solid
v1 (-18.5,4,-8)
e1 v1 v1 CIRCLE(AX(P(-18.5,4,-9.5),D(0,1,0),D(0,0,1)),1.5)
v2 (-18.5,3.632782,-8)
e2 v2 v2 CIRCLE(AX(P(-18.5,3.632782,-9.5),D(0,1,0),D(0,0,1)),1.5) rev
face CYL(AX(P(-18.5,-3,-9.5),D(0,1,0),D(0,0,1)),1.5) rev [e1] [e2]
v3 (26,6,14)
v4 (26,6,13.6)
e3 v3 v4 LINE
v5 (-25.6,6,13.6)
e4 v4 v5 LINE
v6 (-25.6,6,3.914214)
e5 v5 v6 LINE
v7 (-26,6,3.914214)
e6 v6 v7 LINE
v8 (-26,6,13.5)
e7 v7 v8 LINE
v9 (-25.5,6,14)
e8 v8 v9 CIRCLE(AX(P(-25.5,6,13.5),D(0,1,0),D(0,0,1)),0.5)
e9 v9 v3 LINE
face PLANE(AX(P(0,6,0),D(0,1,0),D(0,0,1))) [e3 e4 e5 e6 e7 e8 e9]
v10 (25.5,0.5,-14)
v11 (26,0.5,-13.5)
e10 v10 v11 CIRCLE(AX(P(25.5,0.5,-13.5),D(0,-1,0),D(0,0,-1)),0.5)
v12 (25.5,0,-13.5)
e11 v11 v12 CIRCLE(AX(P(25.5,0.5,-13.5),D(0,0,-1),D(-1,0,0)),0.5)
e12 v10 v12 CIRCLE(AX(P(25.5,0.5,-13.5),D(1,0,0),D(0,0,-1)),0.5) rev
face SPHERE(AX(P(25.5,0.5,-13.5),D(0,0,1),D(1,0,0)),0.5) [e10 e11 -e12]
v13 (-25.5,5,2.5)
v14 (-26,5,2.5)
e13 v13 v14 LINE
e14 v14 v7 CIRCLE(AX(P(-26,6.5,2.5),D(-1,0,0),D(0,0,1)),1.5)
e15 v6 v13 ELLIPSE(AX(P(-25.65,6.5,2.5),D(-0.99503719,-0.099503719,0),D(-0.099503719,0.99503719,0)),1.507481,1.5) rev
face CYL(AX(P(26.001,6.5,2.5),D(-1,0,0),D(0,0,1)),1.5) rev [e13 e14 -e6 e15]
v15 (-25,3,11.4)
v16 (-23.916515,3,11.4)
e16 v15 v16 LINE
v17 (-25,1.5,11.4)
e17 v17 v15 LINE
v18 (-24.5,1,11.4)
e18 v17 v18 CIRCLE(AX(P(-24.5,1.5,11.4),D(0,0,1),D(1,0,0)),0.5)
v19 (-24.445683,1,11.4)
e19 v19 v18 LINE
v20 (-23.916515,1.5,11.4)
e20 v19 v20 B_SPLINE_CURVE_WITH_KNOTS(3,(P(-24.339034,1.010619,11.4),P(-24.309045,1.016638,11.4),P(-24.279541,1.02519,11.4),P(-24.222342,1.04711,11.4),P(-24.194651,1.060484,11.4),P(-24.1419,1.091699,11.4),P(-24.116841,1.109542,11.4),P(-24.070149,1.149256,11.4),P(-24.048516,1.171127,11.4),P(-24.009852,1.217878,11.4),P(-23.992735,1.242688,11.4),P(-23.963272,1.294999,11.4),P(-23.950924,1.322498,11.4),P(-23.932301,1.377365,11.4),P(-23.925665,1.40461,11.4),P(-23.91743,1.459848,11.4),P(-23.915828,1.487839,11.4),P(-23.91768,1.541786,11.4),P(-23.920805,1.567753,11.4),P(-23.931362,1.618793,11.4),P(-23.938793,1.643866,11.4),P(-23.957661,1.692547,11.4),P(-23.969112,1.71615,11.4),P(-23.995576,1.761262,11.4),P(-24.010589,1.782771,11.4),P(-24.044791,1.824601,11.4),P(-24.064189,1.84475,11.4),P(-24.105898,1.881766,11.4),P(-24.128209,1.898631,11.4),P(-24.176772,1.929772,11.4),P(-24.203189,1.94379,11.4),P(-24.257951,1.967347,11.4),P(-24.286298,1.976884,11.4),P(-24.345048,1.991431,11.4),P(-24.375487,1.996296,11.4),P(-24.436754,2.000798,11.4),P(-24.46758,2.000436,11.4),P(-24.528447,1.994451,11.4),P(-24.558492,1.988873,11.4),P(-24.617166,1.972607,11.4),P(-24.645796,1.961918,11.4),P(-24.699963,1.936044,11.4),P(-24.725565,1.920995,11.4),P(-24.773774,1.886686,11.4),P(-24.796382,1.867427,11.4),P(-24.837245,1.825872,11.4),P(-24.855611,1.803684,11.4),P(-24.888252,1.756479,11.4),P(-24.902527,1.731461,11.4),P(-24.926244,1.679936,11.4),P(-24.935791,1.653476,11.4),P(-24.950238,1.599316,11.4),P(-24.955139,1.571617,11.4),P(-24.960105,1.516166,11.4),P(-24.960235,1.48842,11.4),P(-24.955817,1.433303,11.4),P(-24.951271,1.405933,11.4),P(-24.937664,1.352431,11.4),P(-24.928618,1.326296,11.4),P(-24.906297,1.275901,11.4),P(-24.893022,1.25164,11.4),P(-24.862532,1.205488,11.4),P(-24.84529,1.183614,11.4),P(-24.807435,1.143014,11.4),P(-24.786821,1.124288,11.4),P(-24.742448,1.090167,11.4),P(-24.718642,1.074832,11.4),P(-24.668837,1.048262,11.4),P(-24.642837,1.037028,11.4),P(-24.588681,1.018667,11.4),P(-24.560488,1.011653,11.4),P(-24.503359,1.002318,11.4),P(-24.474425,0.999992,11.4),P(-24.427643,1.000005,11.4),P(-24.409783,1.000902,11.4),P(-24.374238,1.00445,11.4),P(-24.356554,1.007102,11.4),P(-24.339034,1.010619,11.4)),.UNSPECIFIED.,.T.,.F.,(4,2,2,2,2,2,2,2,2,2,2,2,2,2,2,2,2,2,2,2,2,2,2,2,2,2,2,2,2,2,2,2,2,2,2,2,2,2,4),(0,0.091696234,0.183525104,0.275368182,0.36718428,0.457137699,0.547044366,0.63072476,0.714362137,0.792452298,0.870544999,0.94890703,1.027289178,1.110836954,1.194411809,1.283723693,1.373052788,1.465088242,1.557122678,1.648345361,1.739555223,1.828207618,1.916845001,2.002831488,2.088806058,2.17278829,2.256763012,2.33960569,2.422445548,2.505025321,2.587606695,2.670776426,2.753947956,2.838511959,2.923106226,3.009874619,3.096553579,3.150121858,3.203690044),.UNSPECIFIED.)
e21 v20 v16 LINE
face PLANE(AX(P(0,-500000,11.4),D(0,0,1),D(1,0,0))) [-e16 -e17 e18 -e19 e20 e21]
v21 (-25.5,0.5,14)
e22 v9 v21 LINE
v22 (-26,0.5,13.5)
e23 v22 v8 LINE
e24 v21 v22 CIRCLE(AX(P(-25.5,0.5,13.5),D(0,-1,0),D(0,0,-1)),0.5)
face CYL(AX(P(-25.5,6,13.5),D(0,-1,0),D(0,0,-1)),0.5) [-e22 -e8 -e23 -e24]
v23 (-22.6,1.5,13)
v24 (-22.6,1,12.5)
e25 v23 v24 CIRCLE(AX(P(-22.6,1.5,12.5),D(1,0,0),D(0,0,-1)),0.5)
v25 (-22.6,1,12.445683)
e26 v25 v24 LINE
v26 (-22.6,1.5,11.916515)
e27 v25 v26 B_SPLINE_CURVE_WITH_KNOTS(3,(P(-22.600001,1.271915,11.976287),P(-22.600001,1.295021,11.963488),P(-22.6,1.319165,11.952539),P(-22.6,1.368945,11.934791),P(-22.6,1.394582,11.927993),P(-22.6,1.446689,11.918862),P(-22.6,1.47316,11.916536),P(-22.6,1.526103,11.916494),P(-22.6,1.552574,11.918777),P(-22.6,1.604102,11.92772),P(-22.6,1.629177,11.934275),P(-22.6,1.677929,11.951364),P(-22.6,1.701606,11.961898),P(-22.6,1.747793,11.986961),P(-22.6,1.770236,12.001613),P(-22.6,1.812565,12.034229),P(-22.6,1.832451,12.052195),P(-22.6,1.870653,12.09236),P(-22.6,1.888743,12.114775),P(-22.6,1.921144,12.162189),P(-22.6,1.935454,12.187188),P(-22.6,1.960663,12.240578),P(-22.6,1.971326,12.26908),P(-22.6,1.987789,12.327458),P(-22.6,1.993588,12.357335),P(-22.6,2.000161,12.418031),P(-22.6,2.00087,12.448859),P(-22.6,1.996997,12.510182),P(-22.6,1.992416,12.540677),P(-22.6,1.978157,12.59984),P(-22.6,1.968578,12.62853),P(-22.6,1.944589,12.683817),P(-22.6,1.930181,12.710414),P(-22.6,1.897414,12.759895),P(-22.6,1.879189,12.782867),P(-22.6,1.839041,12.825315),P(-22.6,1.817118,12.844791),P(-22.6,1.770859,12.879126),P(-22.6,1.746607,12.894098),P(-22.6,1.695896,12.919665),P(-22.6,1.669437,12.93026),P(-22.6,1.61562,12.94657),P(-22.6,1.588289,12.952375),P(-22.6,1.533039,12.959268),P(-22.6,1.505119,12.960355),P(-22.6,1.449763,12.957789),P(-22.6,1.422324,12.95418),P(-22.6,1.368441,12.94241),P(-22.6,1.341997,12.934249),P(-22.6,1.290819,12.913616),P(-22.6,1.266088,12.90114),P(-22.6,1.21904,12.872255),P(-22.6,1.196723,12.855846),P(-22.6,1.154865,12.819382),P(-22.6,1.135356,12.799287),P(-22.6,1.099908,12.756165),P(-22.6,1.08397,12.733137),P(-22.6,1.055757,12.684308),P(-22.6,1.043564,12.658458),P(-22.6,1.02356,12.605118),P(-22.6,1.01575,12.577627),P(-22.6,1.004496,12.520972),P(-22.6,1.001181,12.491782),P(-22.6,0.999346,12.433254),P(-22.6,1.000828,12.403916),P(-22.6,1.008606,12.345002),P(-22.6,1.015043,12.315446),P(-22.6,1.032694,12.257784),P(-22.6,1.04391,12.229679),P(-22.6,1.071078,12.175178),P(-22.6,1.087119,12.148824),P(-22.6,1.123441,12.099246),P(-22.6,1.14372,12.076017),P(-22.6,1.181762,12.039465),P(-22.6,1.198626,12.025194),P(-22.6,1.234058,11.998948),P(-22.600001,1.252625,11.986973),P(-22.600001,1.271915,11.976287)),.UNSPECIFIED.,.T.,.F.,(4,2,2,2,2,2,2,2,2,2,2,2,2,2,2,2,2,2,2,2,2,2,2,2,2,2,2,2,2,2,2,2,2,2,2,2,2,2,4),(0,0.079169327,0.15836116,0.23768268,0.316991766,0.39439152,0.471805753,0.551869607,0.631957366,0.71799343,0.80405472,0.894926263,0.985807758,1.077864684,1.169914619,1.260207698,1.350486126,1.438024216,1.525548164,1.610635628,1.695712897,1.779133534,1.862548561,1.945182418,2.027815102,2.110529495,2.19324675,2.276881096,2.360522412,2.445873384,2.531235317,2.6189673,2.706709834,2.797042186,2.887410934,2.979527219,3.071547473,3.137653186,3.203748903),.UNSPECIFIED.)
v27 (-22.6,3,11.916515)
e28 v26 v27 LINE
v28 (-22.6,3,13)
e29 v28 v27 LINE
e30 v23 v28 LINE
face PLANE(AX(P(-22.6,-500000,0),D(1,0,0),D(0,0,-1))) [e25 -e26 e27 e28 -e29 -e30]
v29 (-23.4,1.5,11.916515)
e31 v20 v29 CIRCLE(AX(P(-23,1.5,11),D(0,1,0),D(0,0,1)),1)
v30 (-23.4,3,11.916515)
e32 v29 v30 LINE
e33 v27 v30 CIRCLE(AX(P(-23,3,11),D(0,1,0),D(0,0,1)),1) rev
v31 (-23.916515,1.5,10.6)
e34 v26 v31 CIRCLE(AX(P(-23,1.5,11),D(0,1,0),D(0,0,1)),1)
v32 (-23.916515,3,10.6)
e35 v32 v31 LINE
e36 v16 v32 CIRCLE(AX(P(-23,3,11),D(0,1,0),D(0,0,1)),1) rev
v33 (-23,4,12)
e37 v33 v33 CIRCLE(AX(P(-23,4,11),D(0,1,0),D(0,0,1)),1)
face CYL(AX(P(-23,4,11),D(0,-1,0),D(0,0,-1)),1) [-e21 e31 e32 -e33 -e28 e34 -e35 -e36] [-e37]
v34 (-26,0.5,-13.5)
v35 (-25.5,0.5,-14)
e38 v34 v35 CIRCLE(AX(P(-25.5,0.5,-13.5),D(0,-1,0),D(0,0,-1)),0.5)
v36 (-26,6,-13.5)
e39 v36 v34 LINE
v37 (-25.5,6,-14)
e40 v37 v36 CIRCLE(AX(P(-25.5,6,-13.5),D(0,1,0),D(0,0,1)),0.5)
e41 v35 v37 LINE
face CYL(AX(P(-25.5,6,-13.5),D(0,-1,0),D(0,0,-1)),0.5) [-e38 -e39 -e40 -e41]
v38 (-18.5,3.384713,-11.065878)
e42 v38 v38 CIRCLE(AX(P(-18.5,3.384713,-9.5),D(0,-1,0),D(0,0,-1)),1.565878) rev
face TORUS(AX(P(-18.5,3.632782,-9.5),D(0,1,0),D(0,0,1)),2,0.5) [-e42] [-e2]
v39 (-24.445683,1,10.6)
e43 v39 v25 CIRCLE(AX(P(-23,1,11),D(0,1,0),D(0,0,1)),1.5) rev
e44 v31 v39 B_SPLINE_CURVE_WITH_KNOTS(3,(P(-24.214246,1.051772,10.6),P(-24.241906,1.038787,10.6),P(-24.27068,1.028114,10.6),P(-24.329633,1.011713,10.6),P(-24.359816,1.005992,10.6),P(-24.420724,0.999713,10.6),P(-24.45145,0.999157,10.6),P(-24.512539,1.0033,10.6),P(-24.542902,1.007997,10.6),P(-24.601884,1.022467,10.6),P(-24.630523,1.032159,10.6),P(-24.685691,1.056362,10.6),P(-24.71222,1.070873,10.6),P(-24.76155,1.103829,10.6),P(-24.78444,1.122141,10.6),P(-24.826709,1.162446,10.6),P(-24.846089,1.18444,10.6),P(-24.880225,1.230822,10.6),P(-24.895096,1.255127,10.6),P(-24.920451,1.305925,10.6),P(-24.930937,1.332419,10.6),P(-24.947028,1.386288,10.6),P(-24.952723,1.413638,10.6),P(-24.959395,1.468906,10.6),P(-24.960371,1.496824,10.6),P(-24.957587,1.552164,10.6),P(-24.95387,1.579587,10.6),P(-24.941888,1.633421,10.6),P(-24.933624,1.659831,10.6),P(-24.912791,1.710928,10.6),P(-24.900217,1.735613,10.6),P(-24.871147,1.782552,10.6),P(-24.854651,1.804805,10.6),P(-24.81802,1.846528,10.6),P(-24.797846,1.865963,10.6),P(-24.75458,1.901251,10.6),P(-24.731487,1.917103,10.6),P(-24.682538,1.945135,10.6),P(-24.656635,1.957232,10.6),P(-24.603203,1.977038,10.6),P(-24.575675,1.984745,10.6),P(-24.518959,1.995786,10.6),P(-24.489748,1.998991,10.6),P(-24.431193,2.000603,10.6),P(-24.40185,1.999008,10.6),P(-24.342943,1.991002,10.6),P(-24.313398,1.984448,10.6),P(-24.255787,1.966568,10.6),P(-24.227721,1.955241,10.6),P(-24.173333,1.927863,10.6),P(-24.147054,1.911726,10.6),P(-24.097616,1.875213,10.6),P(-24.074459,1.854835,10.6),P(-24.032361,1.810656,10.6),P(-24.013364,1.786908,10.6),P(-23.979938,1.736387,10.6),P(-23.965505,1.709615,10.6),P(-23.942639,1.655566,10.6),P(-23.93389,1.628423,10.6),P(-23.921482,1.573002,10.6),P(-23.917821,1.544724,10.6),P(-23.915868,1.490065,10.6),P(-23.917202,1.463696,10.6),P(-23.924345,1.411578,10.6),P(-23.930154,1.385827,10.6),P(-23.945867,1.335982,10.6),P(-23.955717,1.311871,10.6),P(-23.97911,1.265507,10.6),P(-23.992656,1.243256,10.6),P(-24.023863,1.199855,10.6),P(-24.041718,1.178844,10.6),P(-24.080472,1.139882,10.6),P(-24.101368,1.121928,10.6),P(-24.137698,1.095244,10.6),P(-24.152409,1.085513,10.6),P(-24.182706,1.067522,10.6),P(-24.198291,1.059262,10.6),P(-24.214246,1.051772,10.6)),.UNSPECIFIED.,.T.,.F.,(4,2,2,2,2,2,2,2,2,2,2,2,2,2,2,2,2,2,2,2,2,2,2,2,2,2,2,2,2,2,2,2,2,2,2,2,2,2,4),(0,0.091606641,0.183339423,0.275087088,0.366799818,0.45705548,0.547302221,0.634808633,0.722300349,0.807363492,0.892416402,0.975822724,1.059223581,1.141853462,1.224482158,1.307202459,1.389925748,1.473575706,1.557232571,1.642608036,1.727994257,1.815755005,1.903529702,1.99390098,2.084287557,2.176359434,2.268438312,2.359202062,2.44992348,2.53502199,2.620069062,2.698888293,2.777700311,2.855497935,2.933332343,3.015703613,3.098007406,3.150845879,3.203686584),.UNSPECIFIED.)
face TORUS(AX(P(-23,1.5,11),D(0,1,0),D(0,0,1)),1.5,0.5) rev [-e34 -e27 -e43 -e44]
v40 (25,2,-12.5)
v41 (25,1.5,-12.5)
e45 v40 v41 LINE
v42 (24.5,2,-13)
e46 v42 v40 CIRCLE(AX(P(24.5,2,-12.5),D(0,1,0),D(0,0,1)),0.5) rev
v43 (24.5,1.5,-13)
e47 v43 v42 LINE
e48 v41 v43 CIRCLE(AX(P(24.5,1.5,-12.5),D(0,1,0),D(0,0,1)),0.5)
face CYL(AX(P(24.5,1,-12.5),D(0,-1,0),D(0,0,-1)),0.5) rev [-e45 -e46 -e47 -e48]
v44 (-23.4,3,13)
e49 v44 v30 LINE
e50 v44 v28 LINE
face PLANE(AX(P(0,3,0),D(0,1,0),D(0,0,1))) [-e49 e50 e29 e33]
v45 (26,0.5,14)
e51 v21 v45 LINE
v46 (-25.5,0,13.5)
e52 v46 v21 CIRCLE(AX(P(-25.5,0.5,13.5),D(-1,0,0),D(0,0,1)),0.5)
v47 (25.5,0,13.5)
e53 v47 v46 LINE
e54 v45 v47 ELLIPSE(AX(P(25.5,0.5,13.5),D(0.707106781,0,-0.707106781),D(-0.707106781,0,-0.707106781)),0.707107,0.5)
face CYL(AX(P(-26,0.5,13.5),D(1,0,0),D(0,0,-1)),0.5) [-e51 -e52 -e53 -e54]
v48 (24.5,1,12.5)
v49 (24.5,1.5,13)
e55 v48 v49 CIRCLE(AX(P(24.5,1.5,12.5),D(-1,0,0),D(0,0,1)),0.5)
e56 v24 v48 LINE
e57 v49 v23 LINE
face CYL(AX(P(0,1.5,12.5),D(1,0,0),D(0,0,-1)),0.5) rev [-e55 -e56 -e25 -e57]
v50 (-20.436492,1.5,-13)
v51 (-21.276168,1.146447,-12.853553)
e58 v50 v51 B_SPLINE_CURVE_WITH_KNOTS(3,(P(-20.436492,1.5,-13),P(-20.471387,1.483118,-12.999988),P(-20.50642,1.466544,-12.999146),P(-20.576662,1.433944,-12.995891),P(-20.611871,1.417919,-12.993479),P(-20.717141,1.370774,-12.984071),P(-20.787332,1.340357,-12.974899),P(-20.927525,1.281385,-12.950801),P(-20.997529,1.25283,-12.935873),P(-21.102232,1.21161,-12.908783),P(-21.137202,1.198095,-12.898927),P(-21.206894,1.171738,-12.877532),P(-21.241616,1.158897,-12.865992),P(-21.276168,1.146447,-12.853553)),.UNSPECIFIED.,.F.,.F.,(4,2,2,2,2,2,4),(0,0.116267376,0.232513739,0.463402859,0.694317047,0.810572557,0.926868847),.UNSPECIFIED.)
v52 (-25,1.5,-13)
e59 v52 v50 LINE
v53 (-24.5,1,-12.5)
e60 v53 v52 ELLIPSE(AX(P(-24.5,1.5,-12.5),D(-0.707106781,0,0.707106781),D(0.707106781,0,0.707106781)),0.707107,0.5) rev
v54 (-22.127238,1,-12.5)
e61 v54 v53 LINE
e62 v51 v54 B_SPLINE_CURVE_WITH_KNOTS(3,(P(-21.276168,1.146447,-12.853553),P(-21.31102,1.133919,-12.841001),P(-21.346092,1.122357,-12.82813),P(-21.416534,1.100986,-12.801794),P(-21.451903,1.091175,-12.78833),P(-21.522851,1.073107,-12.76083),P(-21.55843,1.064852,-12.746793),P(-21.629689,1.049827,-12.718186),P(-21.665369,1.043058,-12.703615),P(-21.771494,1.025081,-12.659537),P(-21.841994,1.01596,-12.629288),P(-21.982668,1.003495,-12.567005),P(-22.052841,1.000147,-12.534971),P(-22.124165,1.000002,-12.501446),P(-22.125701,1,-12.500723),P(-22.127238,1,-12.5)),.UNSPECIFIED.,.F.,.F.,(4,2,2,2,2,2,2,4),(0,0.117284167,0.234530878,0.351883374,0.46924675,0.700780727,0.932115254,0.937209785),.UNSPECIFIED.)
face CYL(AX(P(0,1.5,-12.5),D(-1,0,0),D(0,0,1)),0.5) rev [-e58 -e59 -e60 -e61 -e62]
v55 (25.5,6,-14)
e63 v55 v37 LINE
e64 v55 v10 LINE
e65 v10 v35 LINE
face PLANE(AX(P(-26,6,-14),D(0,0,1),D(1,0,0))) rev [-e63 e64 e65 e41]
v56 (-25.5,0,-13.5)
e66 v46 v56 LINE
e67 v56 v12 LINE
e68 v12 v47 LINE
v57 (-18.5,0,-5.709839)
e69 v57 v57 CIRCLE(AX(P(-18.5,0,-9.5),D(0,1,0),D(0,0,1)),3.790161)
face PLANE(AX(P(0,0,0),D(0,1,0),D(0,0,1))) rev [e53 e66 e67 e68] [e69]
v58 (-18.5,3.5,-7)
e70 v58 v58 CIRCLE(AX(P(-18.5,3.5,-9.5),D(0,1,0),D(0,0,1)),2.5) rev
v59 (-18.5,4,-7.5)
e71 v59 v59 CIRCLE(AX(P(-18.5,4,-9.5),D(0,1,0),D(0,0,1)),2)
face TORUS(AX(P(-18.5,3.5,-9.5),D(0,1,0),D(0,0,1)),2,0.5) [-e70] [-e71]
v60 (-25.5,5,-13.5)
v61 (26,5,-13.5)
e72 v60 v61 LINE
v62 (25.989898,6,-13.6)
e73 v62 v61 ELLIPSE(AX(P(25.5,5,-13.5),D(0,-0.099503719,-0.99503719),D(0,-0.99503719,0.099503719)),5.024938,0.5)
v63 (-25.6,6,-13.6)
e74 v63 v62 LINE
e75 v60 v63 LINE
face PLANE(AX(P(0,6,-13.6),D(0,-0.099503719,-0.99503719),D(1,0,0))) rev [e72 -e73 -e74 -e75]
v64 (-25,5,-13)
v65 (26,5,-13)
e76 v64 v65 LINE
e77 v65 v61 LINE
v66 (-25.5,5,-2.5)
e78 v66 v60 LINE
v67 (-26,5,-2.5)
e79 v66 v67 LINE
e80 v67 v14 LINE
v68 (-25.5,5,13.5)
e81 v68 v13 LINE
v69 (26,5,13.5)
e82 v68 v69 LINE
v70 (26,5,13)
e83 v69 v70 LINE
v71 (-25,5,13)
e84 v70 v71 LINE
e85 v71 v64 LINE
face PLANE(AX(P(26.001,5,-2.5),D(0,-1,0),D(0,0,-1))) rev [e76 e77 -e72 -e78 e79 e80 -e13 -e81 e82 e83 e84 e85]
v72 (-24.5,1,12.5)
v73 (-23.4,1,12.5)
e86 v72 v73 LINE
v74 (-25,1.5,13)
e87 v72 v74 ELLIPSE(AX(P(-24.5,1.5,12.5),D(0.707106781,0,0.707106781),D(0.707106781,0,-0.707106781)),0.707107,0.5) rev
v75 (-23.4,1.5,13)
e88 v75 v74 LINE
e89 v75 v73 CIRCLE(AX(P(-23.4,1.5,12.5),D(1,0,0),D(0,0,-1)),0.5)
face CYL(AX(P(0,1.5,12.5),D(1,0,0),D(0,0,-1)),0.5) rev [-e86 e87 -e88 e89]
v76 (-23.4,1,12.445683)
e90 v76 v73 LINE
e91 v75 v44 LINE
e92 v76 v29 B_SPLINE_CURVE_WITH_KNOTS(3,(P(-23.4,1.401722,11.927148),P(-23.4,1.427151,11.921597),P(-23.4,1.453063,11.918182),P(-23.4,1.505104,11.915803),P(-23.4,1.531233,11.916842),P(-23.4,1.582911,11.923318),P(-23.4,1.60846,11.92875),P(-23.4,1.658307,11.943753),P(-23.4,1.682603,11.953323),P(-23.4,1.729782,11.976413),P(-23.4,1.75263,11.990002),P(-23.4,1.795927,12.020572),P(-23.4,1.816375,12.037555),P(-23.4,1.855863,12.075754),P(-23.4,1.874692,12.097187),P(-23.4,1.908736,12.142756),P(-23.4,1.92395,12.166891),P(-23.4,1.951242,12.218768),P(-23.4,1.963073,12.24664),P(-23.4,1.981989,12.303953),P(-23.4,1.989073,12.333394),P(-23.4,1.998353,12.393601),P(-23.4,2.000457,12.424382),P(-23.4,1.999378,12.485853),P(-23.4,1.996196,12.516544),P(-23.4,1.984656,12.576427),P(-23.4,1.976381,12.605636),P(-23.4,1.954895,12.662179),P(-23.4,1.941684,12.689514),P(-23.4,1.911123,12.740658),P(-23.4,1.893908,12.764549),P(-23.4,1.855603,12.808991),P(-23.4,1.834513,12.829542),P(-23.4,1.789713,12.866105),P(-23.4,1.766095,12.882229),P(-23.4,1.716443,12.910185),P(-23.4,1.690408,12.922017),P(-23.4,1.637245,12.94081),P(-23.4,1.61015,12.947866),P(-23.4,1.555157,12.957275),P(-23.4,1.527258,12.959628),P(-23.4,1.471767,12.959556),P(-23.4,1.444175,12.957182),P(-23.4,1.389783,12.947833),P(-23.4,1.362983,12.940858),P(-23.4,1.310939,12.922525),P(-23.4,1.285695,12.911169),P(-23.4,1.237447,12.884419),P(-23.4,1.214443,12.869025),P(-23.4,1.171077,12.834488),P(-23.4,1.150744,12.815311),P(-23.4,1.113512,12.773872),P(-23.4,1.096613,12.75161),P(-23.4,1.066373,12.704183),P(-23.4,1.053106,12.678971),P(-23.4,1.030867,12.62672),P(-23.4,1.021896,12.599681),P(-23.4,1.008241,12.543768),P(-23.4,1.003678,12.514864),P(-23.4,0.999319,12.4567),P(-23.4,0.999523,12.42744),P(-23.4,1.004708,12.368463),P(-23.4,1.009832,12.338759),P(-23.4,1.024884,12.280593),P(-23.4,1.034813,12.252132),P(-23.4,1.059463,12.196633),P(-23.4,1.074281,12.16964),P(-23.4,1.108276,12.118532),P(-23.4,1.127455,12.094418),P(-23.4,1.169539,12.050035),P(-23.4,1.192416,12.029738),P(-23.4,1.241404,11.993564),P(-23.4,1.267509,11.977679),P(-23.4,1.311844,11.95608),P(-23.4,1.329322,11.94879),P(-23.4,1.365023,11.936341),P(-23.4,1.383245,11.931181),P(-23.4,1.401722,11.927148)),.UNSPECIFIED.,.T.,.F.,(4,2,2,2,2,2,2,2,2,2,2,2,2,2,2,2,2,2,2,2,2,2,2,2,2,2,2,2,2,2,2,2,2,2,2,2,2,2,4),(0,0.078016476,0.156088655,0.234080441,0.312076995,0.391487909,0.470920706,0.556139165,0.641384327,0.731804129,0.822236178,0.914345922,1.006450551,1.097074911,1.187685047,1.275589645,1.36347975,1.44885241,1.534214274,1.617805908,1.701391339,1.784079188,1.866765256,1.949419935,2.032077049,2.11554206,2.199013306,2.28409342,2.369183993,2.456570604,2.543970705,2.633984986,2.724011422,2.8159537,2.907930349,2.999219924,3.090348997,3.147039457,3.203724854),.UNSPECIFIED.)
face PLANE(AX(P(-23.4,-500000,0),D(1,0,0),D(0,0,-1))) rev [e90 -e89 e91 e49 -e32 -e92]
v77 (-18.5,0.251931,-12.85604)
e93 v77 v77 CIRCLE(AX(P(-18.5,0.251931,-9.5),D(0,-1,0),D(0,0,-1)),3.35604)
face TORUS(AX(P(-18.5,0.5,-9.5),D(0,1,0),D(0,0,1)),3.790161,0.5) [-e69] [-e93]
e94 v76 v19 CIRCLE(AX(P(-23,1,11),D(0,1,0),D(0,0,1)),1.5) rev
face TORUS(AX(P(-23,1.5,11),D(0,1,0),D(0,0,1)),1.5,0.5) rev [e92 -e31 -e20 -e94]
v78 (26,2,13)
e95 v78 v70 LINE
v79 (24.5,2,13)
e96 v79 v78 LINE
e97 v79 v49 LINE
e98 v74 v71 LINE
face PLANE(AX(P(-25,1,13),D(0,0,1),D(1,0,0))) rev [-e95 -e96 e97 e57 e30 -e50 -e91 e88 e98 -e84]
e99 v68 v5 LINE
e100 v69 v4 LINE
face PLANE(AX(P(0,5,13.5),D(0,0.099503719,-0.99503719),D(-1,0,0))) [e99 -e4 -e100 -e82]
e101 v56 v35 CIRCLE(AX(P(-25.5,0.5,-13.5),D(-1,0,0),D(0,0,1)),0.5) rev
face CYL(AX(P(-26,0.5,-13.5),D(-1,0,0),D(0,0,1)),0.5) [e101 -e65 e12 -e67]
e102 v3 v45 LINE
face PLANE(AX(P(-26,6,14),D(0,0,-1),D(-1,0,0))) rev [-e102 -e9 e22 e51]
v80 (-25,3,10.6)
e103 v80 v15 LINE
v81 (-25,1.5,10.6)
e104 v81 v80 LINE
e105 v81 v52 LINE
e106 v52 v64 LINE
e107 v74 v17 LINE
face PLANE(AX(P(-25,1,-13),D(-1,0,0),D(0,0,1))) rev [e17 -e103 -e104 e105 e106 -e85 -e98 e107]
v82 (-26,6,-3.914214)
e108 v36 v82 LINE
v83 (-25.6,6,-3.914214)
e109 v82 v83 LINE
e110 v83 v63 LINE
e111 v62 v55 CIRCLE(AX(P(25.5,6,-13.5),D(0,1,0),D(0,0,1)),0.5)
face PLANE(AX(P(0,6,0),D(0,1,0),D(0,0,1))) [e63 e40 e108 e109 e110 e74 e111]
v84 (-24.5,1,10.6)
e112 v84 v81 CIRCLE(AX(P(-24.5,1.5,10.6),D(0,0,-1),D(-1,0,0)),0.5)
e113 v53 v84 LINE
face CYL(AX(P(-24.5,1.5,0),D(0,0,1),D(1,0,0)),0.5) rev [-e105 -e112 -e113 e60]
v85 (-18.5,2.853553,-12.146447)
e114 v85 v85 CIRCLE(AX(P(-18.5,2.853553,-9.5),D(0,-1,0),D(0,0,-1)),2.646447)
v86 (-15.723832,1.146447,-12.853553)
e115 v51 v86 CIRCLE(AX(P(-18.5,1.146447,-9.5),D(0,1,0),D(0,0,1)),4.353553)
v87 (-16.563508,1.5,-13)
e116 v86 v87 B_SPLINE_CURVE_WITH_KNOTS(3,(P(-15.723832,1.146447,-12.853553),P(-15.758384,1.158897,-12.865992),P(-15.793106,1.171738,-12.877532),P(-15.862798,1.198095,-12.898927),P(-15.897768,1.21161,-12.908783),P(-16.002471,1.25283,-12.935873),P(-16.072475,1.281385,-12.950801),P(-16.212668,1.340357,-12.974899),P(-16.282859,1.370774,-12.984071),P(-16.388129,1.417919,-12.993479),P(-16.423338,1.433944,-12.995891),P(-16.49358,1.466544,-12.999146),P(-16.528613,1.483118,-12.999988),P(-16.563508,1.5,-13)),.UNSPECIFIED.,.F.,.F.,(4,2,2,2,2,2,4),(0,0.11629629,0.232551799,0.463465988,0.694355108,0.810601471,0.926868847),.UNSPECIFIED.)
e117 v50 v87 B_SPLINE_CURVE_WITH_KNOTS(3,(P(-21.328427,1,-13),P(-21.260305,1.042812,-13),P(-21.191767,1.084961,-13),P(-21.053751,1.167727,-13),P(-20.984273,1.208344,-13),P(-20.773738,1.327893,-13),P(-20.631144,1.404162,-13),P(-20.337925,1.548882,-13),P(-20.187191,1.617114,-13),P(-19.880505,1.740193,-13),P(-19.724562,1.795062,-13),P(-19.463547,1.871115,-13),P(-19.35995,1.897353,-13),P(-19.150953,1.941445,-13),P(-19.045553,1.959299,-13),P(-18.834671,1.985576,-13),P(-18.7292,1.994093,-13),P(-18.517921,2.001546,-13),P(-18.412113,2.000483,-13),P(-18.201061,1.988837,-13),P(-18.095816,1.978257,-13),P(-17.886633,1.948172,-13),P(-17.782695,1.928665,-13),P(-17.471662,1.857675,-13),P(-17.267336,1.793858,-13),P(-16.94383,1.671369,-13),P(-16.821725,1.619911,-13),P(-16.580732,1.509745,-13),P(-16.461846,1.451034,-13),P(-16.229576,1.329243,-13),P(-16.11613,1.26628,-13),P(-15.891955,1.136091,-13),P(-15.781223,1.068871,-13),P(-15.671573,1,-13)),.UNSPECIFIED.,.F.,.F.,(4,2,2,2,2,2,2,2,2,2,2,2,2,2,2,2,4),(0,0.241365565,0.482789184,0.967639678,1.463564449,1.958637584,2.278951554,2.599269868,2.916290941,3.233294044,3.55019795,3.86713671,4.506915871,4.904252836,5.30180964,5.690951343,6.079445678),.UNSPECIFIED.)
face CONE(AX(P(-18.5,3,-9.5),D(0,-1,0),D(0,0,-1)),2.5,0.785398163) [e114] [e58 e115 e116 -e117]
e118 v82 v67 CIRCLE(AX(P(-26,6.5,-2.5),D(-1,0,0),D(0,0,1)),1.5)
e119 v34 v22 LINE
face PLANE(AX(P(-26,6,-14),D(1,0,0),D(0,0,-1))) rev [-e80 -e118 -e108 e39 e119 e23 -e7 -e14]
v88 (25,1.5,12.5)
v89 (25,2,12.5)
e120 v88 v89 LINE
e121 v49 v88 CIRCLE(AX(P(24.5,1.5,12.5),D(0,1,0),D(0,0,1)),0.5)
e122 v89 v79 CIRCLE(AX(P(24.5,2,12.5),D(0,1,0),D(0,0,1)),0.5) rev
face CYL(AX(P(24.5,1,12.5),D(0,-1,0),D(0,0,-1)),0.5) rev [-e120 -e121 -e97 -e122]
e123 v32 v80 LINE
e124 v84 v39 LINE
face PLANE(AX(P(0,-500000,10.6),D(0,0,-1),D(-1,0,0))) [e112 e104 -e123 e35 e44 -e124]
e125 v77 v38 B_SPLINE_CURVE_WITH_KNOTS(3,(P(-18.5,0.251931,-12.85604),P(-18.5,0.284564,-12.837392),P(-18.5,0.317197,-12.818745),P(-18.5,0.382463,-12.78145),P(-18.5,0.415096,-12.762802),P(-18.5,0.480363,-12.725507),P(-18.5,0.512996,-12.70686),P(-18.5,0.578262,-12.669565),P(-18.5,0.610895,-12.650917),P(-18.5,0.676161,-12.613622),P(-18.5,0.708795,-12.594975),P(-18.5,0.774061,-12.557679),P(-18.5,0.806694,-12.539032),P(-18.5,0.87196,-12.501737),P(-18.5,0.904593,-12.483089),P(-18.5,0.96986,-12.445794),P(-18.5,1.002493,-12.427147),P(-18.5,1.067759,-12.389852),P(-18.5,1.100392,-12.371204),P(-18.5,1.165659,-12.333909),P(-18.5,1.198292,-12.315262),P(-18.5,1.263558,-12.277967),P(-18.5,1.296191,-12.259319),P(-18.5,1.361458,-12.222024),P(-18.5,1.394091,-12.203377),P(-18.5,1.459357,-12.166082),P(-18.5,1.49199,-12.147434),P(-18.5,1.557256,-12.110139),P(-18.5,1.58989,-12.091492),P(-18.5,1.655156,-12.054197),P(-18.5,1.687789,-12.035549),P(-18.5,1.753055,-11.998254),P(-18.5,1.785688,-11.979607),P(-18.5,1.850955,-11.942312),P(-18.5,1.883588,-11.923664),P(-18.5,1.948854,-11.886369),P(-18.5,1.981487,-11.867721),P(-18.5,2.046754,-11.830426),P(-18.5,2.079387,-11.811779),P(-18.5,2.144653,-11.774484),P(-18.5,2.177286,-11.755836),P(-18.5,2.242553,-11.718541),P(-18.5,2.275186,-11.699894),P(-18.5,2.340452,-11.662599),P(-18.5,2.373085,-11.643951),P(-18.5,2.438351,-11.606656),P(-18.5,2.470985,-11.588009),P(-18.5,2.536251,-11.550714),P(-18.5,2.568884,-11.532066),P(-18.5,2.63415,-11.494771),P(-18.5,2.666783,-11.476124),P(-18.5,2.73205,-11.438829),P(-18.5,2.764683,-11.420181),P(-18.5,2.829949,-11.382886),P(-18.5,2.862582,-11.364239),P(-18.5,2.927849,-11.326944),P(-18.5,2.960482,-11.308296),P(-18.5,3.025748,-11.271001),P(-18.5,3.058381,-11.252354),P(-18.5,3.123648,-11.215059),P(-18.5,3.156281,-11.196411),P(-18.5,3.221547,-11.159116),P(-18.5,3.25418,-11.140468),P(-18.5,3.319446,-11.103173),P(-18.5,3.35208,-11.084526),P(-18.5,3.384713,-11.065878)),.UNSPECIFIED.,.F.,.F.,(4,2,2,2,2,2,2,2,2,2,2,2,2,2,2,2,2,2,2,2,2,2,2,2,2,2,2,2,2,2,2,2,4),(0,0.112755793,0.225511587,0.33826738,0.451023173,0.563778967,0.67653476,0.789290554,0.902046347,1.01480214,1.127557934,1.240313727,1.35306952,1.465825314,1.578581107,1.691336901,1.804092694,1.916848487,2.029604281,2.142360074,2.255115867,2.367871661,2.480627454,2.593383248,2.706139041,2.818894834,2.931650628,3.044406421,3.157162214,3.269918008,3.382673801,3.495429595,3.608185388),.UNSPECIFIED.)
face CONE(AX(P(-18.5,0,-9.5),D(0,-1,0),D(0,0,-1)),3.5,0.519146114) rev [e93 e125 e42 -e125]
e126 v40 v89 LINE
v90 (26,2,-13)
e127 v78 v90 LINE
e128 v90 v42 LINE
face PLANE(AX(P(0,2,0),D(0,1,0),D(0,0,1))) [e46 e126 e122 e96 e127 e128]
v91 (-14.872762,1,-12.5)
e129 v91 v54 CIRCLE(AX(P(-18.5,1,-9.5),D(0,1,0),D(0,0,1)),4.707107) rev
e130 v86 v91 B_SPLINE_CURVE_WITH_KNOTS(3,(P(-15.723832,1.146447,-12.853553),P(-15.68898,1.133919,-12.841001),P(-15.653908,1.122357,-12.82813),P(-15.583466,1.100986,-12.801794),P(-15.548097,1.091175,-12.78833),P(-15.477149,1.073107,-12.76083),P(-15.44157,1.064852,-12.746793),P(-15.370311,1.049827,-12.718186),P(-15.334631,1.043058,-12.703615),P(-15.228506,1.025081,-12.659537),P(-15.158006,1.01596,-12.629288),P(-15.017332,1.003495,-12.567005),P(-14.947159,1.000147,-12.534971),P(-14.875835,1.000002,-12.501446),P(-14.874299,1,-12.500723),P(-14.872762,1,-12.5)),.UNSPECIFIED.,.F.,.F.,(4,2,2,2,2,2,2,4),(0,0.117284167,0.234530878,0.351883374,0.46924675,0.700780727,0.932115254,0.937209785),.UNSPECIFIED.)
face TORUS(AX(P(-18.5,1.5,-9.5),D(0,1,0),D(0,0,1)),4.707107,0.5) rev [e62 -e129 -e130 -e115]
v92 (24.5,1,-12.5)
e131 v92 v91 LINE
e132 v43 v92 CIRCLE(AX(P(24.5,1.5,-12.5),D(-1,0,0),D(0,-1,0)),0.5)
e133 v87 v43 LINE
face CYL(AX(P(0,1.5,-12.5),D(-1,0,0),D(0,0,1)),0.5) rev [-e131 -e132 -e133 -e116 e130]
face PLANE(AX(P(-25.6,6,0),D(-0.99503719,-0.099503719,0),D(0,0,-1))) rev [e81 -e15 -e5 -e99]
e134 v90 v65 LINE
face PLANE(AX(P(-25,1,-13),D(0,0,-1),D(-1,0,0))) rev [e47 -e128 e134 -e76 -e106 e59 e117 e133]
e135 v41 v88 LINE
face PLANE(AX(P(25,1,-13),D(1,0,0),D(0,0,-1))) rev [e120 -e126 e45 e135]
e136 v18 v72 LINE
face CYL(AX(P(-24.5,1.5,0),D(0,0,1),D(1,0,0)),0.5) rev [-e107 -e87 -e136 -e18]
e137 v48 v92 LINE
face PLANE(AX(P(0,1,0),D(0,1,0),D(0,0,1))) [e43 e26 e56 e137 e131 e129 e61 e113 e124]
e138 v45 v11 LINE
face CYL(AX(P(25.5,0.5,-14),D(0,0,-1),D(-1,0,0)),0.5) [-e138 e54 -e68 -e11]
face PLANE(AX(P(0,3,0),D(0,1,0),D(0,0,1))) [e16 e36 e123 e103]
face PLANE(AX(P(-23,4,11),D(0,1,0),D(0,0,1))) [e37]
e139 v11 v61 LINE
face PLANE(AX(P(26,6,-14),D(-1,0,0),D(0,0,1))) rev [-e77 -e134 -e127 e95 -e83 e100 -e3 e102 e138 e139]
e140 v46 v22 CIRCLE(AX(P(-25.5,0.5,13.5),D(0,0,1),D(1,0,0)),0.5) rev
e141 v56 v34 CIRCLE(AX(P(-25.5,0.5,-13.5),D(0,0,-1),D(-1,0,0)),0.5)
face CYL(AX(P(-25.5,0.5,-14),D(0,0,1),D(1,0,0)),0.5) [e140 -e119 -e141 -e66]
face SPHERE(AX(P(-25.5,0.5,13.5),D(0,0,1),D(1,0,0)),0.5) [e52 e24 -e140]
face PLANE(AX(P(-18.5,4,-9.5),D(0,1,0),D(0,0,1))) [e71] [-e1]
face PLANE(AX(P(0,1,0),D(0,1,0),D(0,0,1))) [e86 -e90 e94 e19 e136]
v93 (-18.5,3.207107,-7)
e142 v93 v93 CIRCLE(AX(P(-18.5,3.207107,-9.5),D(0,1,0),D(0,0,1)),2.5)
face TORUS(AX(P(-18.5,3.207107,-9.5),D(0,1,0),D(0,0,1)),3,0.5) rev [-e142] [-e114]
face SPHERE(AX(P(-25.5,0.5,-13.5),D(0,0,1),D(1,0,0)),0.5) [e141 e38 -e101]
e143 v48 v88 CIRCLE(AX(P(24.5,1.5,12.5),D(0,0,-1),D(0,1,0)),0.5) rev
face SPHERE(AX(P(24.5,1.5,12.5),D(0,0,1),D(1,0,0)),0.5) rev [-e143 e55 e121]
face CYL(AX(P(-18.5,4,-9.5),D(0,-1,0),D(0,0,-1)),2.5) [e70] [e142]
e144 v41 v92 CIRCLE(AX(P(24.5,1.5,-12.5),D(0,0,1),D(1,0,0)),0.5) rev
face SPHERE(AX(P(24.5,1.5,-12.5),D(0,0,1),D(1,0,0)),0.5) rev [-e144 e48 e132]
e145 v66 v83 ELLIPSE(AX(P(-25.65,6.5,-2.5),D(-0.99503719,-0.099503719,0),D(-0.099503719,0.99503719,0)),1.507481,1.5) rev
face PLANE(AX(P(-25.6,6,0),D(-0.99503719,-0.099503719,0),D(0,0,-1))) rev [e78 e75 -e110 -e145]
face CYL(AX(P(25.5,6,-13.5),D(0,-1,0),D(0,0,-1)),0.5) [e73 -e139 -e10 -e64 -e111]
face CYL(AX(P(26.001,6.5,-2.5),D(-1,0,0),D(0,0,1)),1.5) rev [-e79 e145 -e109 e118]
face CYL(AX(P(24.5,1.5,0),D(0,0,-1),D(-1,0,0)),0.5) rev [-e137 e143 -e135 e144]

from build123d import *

# Parameters (mm, degrees)
SKETCH_1_W          = 52
SKETCH_1_H          = 28
EXTRUDE_1_DEPTH     = 6
SKETCH_2_W          = 50
SKETCH_2_H          = 26
CUT_EXTRUDE_1_DEPTH = 5
SKETCH_3_W          = 1
SKETCH_3_H          = 26
CUT_EXTRUDE_2_DEPTH = 4
CUT_EXTRUDE_3_REACH = 56.185
SKETCH_6_R          = 1.5
CUT_EXTRUDE_4_DEPTH = 4
EXTRUDE_START       = 3
SKETCH_7_R          = 2.5
SKETCH_7_R_2        = 1.5
SKETCH_7_R_3        = 1
EXTRUDE_3_DEPTH     = 3
CHAMFER_2_SIZE      = 2
CHAMFER_3_SIZE      = 3.5
CHAMFER_3_SIZE2     = 2
FILLET_1_R          = 0.5
FILLET_2_R          = 0.5
EXTRUDE_4_REACH     = 32.799
EXTRUDE_START_2     = -1
SKETCH_9_W          = 0.8
SKETCH_9_H          = 2
CUT_EXTRUDE_5_DEPTH = 1
CHAMFER_4_SIZE      = 1
CHAMFER_4_SIZE_2    = 0.1


# Some blends are built 0.0001 mm under size
with BuildPart() as part:
    # Эскиз1 → Бобышка-Вытянуть1 (new body)
    with BuildSketch(Plane(origin=(0, 0, 0), x_dir=(1, 0, 0), z_dir=(0, 1, 0))):
        Rectangle(SKETCH_1_W, SKETCH_1_H)
    extrude(amount=EXTRUDE_1_DEPTH)

    # Эскиз2 → Вырез-Вытянуть1 (cut)
    with BuildSketch(Plane(origin=(0, 6, 0), x_dir=(1, 0, 0), z_dir=(0, 1, 0))):
        Rectangle(SKETCH_2_W, SKETCH_2_H)
    extrude(amount=-CUT_EXTRUDE_1_DEPTH, mode=Mode.SUBTRACT)

    # Эскиз3 → Вырез-Вытянуть2 (cut)
    with BuildSketch(Plane(origin=(0, 6, 0), x_dir=(1, 0, 0), z_dir=(0, 1, 0))):
        with Locations((25.5, 0)):
            Rectangle(SKETCH_3_W, SKETCH_3_H)
    extrude(amount=-CUT_EXTRUDE_2_DEPTH, mode=Mode.SUBTRACT)

    # Эскиз4 → Вырез-Вытянуть3 (cut, up to next)
    with BuildSketch(Plane.ZY.offset(26), mode=Mode.PRIVATE) as cut_extrude_3_sk1:
        with BuildLine():
            Line((-2.5, 8), (2.5, 8))
            ThreePointArc((2.5, 8), (4, 6.5), (2.5, 5))
            Line((2.5, 5), (-2.5, 5))
            ThreePointArc((-2.5, 5), (-4, 6.5), (-2.5, 8))
        make_face()
    cut_extrude_3_tool1 = extrude(cut_extrude_3_sk1.sketch, amount=-CUT_EXTRUDE_3_REACH, mode=Mode.PRIVATE) & part.part
    add(cut_extrude_3_tool1.solids().sort_by_distance((-26, 6.5, 0))[0], mode=Mode.SUBTRACT)

    # Эскиз6 → Вырез-Вытянуть4 (cut)
    with BuildSketch(Plane(origin=(0, 1, 0), x_dir=(1, 0, 0), z_dir=(0, 1, 0))):
        with Locations(Location((-18.5, 9.5, 0), (0, 0, 270))):
            Circle(SKETCH_6_R)
    extrude(amount=-CUT_EXTRUDE_4_DEPTH, mode=Mode.SUBTRACT)

    # Эскиз7 → Бобышка-Вытянуть3 (add)
    # profile 1 of 2: a face of its own
    with BuildSketch(Plane(origin=(0, 1, 0), x_dir=(1, 0, 0), z_dir=(0, 1, 0)).offset(EXTRUDE_START)):
        with Locations(Location((-18.5, 9.5, 0), (0, 0, 270))):
            Circle(SKETCH_7_R)
        with Locations(Location((-18.5, 9.5, 0), (0, 0, 270))):
            Circle(SKETCH_7_R_2, mode=Mode.SUBTRACT)
    # profile 2 of 2: a face of its own
    with BuildSketch(Plane(origin=(0, 1, 0), x_dir=(1, 0, 0), z_dir=(0, 1, 0)).offset(EXTRUDE_START)):
        with Locations(Location((-23, -11, 0), (0, 0, 270))):
            Circle(SKETCH_7_R_3)
    extrude(amount=-EXTRUDE_3_DEPTH)

    # Фаска2
    # the kernel refuses this chamfer: 2 mm, written as the material it adds along each edge
    with BuildSketch(Plane(origin=(-18.5, 1, -9.5), x_dir=(0, 0, 1), z_dir=(-1, 0, 0))) as chamfer_2_piece_1:
        Polygon((2.5 + CHAMFER_2_SIZE, 0), (2.5, CHAMFER_2_SIZE), (2.5, 0), align=None)
    revolve(axis=Axis((-18.5, 1, -9.5), (0, 1, 0)))

    # Фаска3
    chamfer_3_edges = [part.edges().sort_by_distance(p)[0] for p in [
        (-18.5, 0, -11),
    ]]
    chamfer_3_side = [part.faces().sort_by_distance(p)[0] for p in [
        (-18.5, 2, -11),
    ]]
    chamfer(chamfer_3_edges, length=CHAMFER_3_SIZE, length2=CHAMFER_3_SIZE2, reference=chamfer_3_side[0])

    # Скругление1
    fillet_1_edges = [part.edges().sort_by_distance(p)[0] for p in [
        (-25, 1, 0),
        (4.664213562, 1, -13),
        (-23.164213562, 1, -13),
        (25, 1, 0),
        (0, 1, 13),
        (-22.742640687, 1, -8),
        (0, 0, -14),
        (-26, 0, 0),
        (0, 0, 14),
        (26, 0, 0),
        (-18.5, 0, -13),
        (-18.5, 4, -12),
        (-18.5, 3, -12),
        (25, 1.5, -13),
        (25, 1.5, 13),
        (26, 3, -14),
        (-26, 3, -14),
        (-26, 3, 14),
        (-18.5, 3.5, -11),
    ]]
    fillet(fillet_1_edges, radius=FILLET_1_R)

    # Скругление2
    fillet_2_edges = [part.edges().sort_by_distance(p)[0] for p in [
        (-23, 1, 10),
    ]]
    fillet(fillet_2_edges, radius=FILLET_2_R - 0.0001)  # a hair under: the kernel refuses the full size

    # Эскиз9 → Бобышка-Вытянуть4 (add, up to next)
    with BuildSketch(Plane(origin=(0, 4, 0), x_dir=(1, 0, 0), z_dir=(0, 1, 0)).offset(EXTRUDE_START_2), mode=Mode.PRIVATE) as extrude_4_sk1:
        with Locations((-23, -12)):
            Rectangle(SKETCH_9_W, SKETCH_9_H)
    extrude_4_tool1 = extrude(extrude_4_sk1.sketch, amount=-EXTRUDE_4_REACH, mode=Mode.PRIVATE) - part.part
    # Эскиз9 → Бобышка-Вытянуть4 (add, up to next)
    with BuildSketch(Plane(origin=(0, 4, 0), x_dir=(1, 0, 0), z_dir=(0, 1, 0)).offset(EXTRUDE_START_2), mode=Mode.PRIVATE) as extrude_4_sk2:
        Polygon((-25, -11), (-25, -11.4), (-23, -11.4), (-23, -11), (-23, -10.6), (-25, -10.6), align=None)
    extrude_4_tool2 = extrude(extrude_4_sk2.sketch, amount=-EXTRUDE_4_REACH, mode=Mode.PRIVATE) - part.part
    add(extrude_4_tool1.solids().sort_by_distance((-23, 3, 12))[0])
    add(extrude_4_tool2.solids().sort_by_distance((-24, 3, 11))[0])

    # Эскиз10 → Вырез-Вытянуть5 (cut)
    with BuildSketch(Plane(origin=(0, 6, 0), x_dir=(1, 0, 0), z_dir=(0, 1, 0))):
        Polygon((26, 13), (26, 13.5), (-25.5, 13.5), (-25.5, -13.5), (26, -13.5), (26, -13), (-25, -13), (-25, 13), align=None)
    extrude(amount=-CUT_EXTRUDE_5_DEPTH, mode=Mode.SUBTRACT)

    # Фаска4
    # the kernel refuses this chamfer: 1, 0.1 mm, written as the material it takes off along each edge
    with BuildSketch(Plane(origin=(-25.5, 6, -16.099522763), x_dir=(0, -1, 0), z_dir=(0, 0, 1))) as chamfer_4_piece_1_section:
        Polygon((CHAMFER_4_SIZE, 0), (0, -CHAMFER_4_SIZE_2), (0, 0), align=None)
    chamfer_4_piece_1 = extrude(amount=14.784831964, mode=Mode.PRIVATE)
    chamfer_4_piece_1 = split(chamfer_4_piece_1, bisect_by=Plane(origin=(-25.5, 6.247477501, -13.62474775), z_dir=(0, 0.09950371902099857, 0.9950371902099893)), keep=Keep.TOP, mode=Mode.PRIVATE)
    add(chamfer_4_piece_1, mode=Mode.SUBTRACT)
    with BuildSketch(Plane(origin=(28.599522763, 6, -13.5), x_dir=(0, -1, 0), z_dir=(-1, 0, 0))) as chamfer_4_piece_2_section:
        Polygon((CHAMFER_4_SIZE, 0), (0, -CHAMFER_4_SIZE_2), (0, 0), align=None)
    chamfer_4_piece_2 = extrude(amount=56.699045526, mode=Mode.PRIVATE)
    chamfer_4_piece_2 = split(chamfer_4_piece_2, bisect_by=Plane(origin=(-25.063371062, 0.633710618, -13.5), z_dir=(0.995037190209989, 0.09950371902100032, 0)), keep=Keep.TOP, mode=Mode.PRIVATE)
    add(chamfer_4_piece_2, mode=Mode.SUBTRACT)
    with BuildSketch(Plane(origin=(-28.099522763, 6, 13.5), x_dir=(0, -1, 0), z_dir=(1, 0, 0))) as chamfer_4_piece_3_section:
        Polygon((CHAMFER_4_SIZE, 0), (0, -CHAMFER_4_SIZE_2), (0, 0), align=None)
    chamfer_4_piece_3 = extrude(amount=56.699045526, mode=Mode.PRIVATE)
    chamfer_4_piece_3 = split(chamfer_4_piece_3, bisect_by=Plane(origin=(-25.62474775, 6.247477501, 13.5), z_dir=(0.995037190209989, 0.09950371902100032, 0)), keep=Keep.TOP, mode=Mode.PRIVATE)
    add(chamfer_4_piece_3, mode=Mode.SUBTRACT)
    with BuildSketch(Plane(origin=(-25.5, 6, 1.314690799), x_dir=(0, -1, 0), z_dir=(0, 0, 1))) as chamfer_4_piece_4_section:
        Polygon((CHAMFER_4_SIZE, 0), (0, -CHAMFER_4_SIZE_2), (0, 0), align=None)
    chamfer_4_piece_4 = extrude(amount=14.784831964, mode=Mode.PRIVATE)
    chamfer_4_piece_4 = split(chamfer_4_piece_4, bisect_by=Plane(origin=(-25.5, 4.783632752, 13.478363275), z_dir=(0, 0.09950371902099857, -0.9950371902099893)), keep=Keep.TOP, mode=Mode.PRIVATE)
    add(chamfer_4_piece_4, mode=Mode.SUBTRACT)


solid = part.part
